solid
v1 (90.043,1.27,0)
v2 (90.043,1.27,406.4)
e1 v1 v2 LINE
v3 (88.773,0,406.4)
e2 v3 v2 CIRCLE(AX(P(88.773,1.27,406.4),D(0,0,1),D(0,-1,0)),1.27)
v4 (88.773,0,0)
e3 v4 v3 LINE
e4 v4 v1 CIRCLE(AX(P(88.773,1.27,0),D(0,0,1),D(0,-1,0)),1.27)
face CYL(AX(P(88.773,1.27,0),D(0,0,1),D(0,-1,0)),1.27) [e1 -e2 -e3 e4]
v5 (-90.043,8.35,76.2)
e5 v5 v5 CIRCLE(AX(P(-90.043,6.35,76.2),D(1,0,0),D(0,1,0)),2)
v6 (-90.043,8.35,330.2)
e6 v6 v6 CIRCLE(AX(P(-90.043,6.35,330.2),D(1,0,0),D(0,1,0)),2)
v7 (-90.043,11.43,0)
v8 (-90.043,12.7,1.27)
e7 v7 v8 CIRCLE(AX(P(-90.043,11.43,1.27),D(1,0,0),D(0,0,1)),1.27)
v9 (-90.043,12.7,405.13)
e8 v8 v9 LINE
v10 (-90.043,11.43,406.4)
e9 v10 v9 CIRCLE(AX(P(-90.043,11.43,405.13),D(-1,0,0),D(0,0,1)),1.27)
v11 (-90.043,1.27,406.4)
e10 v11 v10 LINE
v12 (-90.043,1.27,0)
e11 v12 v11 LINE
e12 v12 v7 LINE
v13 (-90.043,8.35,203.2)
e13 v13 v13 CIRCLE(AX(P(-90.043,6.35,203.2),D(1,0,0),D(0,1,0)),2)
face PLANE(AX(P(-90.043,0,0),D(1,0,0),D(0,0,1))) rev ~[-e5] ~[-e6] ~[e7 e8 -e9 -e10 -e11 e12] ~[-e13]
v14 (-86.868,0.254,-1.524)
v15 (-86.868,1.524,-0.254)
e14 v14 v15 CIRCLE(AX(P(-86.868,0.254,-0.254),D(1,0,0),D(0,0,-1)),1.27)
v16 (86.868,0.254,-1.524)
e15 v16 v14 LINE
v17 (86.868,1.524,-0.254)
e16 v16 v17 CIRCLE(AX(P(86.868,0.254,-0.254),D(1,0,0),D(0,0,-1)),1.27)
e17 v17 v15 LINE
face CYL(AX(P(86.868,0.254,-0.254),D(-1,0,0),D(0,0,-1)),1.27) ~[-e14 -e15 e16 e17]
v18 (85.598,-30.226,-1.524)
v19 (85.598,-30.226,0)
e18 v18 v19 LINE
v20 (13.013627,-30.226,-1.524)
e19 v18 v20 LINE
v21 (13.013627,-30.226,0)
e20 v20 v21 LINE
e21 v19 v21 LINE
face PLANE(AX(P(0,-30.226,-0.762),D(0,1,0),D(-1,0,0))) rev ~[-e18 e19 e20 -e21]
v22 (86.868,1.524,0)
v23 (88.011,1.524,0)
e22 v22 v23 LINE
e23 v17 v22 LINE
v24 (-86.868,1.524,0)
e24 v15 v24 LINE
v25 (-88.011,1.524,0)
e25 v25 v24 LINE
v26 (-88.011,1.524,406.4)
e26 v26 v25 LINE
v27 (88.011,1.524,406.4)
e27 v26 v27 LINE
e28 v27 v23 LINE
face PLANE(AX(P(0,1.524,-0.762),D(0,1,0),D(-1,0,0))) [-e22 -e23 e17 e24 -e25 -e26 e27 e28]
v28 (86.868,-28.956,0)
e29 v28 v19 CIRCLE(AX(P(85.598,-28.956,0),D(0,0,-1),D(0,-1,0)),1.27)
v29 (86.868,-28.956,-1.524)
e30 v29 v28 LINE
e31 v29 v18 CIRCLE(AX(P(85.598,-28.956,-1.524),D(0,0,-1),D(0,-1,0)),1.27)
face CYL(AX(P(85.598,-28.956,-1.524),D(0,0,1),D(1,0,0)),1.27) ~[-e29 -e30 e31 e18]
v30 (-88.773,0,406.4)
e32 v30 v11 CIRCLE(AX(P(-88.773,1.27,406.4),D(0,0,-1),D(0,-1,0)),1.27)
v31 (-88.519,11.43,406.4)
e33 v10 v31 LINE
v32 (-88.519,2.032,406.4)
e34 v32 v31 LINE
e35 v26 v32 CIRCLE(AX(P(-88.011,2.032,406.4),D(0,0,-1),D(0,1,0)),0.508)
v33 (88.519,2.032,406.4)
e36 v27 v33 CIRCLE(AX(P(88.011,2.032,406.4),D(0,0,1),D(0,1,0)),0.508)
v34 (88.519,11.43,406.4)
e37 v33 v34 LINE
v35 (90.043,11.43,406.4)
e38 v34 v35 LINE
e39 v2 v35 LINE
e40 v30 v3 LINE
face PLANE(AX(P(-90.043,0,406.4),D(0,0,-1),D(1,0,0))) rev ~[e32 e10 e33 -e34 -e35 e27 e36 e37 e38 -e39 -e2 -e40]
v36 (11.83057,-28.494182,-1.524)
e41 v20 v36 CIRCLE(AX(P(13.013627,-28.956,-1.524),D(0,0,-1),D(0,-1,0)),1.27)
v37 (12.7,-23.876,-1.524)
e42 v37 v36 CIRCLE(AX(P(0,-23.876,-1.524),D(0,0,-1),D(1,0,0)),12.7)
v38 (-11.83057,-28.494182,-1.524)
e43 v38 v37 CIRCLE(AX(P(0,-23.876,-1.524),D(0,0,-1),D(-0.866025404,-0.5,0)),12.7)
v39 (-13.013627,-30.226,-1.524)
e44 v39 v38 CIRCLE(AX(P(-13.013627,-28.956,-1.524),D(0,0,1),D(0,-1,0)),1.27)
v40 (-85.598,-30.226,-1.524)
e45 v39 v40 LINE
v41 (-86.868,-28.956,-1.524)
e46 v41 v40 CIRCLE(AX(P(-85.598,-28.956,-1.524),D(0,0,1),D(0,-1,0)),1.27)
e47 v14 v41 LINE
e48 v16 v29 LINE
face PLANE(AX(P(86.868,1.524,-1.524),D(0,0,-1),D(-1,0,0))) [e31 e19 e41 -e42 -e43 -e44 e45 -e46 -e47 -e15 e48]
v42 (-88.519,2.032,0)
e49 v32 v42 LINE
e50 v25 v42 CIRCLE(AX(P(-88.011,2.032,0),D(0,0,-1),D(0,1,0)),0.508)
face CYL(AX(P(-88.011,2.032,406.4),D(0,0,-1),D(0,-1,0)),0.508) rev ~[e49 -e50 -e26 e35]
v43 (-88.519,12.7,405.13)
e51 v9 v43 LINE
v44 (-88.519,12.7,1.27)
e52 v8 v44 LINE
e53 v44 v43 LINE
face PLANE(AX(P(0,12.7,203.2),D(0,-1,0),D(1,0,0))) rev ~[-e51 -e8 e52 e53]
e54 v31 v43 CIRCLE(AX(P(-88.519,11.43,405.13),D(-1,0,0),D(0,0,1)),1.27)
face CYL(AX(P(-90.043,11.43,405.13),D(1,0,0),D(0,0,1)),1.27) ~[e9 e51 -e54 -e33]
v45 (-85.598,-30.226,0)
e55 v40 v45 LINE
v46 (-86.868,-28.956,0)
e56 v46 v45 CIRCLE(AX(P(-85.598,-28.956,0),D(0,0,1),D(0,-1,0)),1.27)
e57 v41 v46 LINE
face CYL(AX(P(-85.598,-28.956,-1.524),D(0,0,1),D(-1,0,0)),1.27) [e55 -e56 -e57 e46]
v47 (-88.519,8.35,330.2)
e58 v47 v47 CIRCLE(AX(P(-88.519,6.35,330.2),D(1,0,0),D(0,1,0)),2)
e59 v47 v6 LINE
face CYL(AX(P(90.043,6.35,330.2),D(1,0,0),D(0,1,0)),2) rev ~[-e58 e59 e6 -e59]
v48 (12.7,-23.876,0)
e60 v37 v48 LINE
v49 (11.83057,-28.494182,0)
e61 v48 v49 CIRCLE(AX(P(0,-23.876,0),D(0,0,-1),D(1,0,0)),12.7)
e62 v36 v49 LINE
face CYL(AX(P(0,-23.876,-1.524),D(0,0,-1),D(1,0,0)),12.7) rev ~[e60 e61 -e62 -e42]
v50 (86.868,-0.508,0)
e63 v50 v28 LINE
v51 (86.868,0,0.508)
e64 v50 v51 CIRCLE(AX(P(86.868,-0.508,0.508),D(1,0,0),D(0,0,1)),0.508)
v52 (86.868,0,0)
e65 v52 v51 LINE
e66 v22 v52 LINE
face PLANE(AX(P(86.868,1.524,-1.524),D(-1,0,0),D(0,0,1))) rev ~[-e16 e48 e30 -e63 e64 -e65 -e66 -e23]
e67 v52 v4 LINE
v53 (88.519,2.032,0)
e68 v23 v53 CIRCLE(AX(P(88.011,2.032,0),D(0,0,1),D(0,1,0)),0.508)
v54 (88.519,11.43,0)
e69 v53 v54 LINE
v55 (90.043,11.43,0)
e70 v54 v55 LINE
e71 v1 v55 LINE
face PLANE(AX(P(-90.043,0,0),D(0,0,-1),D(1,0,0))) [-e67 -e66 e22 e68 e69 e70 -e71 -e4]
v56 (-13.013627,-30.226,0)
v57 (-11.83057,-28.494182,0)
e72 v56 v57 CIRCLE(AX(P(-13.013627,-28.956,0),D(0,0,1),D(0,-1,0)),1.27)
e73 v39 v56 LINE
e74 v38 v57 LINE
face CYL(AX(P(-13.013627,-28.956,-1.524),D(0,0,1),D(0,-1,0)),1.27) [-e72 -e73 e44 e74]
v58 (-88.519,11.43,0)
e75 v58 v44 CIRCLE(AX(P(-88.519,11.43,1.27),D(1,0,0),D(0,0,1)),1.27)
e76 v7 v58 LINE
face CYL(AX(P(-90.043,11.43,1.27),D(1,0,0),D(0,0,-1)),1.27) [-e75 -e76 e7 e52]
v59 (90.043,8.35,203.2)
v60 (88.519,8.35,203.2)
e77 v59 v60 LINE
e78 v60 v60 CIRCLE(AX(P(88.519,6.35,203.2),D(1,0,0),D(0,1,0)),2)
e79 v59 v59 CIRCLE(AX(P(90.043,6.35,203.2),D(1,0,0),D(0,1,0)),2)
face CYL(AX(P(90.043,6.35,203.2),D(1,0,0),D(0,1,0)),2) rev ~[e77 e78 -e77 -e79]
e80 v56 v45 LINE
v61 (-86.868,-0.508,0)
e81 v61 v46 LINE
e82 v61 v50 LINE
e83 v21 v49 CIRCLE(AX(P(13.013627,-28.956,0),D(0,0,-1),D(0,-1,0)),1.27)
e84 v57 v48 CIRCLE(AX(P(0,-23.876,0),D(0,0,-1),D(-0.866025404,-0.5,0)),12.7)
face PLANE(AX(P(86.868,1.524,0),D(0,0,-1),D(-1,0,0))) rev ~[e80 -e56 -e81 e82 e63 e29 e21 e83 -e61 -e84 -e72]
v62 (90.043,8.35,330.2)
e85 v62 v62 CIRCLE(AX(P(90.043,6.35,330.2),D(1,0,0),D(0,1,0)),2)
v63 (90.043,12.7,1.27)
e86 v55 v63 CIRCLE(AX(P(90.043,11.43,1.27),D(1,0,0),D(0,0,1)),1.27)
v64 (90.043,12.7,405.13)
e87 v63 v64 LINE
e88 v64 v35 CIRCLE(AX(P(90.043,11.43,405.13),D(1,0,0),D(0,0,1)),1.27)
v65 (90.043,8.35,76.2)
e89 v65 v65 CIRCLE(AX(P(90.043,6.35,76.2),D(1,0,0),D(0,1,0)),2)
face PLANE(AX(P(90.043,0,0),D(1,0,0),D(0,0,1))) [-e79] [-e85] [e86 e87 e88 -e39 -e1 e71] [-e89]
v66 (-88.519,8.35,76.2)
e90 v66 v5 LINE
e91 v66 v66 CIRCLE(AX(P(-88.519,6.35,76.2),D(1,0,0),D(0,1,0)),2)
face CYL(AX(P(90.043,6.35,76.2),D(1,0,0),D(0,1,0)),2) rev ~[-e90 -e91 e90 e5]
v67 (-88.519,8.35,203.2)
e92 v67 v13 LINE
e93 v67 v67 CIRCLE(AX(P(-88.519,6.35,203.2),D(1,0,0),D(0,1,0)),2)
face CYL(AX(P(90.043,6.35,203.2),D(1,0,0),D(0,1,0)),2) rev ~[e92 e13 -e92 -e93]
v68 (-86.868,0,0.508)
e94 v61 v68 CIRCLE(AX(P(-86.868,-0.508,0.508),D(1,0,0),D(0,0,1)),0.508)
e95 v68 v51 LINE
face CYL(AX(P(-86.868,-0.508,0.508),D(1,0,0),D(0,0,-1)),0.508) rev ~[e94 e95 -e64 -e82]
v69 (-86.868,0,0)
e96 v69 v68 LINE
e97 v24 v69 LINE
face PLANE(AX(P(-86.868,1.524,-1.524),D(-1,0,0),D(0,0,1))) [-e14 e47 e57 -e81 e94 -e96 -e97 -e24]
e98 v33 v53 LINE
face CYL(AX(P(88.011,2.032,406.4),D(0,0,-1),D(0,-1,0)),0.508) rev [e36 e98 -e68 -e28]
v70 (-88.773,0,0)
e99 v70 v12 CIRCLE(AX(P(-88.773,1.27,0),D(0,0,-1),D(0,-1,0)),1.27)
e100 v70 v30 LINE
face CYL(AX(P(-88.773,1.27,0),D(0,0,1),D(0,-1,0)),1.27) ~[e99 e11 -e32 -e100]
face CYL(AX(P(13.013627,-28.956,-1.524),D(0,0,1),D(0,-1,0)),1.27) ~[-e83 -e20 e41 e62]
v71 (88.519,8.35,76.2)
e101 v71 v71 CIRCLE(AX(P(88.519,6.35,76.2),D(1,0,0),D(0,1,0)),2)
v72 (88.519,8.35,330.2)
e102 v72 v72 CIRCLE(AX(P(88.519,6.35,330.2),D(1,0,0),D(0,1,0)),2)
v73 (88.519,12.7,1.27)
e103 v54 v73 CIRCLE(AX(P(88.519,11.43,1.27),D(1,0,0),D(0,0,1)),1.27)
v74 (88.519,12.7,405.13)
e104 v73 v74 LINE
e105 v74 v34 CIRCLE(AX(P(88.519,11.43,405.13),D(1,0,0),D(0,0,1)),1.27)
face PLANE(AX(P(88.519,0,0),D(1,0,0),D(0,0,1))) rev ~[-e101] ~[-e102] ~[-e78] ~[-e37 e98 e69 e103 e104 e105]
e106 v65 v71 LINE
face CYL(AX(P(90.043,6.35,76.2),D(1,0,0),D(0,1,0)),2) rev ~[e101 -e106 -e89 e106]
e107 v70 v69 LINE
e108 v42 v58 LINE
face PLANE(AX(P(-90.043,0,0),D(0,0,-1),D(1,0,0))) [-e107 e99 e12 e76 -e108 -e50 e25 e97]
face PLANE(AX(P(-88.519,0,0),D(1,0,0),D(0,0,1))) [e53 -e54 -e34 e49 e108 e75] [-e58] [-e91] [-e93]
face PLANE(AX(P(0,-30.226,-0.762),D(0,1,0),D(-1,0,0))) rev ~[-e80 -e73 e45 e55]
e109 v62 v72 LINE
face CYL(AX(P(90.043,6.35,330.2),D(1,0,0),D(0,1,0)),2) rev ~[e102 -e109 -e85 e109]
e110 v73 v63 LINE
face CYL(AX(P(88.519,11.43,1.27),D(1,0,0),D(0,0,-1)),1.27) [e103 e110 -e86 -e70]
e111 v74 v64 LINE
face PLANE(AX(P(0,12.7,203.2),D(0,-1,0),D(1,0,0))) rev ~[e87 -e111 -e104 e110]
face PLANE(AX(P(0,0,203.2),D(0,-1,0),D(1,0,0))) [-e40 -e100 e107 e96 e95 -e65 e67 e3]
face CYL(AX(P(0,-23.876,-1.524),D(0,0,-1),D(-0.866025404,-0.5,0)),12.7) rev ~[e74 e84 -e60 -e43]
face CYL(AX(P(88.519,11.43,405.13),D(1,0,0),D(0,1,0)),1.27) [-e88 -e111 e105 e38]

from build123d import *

# Parameters (mm, degrees)
F0_W     = 180.086
F0_H     = 406.4
F1_DEPTH = 12.7
F2_T     = -1.524
F3_R     = 2
F4_DEPTH = 180.087
F5_W     = 173.736
F5_H     = 1.524
F6_DEPTH = 31.75
F8_DEPTH = 25.4
F9_R     = 1.27
F10_R    = 0.508


with BuildPart() as f1:
    # F0 (on Front) → F1 (new body)
    with BuildSketch(Plane.XZ):
        with Locations((0, 203.2)):
            Rectangle(F0_W, F0_H)
    extrude(amount=-F1_DEPTH)

    # F2
    f2_openings = [f1.faces().sort_by_distance(p)[0] for p in [
        (0, 6.35, 406.4),
        (0, 6.35, 0),
        (0, 12.7, 203.2),
    ]]
    offset(amount=F2_T, openings=f2_openings)

    # F3 (on face) → F4 (cut, through all)
    with BuildSketch(Plane.YZ.offset(90.043)):
        with Locations((6.35, 76.2)):
            Circle(F3_R)
        with Locations((6.35, 330.2)):
            Circle(F3_R)
        with Locations((6.35, 203.2)):
            Circle(F3_R)
    extrude(amount=-F4_DEPTH, mode=Mode.SUBTRACT)

    # F5 (on face) → F6 (join)
    with BuildSketch(Plane(origin=(0, 1.524, 0), x_dir=(-1, 0, 0), z_dir=(0, 1, 0))):
        with Locations((0, -0.762)):
            Rectangle(F5_W, F5_H)
    extrude(amount=-F6_DEPTH)

    # F7 (on face) → F8 (cut)
    with BuildSketch(Plane(origin=(0, 0, -1.524), x_dir=(1, 0, 0), z_dir=(0, 0, -1))):
        with BuildLine():
            ThreePointArc((-10.9985226281, 30.226), (-3.2870018728, 11.6087420061), (12.7, 23.876))
            ThreePointArc((12.7, 23.876), (12.2672579939, 27.1630018728), (10.9985226281, 30.226))
            Line((10.9985226281, 30.226), (-10.9985226281, 30.226))
        make_face()
    extrude(amount=-F8_DEPTH, mode=Mode.SUBTRACT)

    # F9
    f9_edges = [f1.edges().sort_by_distance(p)[0] for p in [
        (90.043, 0, 203.2),
        (0, 1.524, -1.524),
        (-90.043, 0, 203.2),
        (-10.998523, -30.226, -0.762),
        (10.998523, -30.226, -0.762),
        (-86.868, -30.226, -0.762),
        (86.868, -30.226, -0.762),
        (-89.281, 12.7, 0),
        (89.281, 12.7, 0),
        (89.281, 12.7, 406.4),
        (-89.281, 12.7, 406.4),
    ]]
    fillet(f9_edges, radius=F9_R)

    # F10
    f10_edges = [f1.edges().sort_by_distance(p)[0] for p in [
        (-88.519, 1.524, 203.2),
        (88.519, 1.524, 203.2),
        (0, 0, 0),
    ]]
    fillet(f10_edges, radius=F10_R)


solid = f1.part
